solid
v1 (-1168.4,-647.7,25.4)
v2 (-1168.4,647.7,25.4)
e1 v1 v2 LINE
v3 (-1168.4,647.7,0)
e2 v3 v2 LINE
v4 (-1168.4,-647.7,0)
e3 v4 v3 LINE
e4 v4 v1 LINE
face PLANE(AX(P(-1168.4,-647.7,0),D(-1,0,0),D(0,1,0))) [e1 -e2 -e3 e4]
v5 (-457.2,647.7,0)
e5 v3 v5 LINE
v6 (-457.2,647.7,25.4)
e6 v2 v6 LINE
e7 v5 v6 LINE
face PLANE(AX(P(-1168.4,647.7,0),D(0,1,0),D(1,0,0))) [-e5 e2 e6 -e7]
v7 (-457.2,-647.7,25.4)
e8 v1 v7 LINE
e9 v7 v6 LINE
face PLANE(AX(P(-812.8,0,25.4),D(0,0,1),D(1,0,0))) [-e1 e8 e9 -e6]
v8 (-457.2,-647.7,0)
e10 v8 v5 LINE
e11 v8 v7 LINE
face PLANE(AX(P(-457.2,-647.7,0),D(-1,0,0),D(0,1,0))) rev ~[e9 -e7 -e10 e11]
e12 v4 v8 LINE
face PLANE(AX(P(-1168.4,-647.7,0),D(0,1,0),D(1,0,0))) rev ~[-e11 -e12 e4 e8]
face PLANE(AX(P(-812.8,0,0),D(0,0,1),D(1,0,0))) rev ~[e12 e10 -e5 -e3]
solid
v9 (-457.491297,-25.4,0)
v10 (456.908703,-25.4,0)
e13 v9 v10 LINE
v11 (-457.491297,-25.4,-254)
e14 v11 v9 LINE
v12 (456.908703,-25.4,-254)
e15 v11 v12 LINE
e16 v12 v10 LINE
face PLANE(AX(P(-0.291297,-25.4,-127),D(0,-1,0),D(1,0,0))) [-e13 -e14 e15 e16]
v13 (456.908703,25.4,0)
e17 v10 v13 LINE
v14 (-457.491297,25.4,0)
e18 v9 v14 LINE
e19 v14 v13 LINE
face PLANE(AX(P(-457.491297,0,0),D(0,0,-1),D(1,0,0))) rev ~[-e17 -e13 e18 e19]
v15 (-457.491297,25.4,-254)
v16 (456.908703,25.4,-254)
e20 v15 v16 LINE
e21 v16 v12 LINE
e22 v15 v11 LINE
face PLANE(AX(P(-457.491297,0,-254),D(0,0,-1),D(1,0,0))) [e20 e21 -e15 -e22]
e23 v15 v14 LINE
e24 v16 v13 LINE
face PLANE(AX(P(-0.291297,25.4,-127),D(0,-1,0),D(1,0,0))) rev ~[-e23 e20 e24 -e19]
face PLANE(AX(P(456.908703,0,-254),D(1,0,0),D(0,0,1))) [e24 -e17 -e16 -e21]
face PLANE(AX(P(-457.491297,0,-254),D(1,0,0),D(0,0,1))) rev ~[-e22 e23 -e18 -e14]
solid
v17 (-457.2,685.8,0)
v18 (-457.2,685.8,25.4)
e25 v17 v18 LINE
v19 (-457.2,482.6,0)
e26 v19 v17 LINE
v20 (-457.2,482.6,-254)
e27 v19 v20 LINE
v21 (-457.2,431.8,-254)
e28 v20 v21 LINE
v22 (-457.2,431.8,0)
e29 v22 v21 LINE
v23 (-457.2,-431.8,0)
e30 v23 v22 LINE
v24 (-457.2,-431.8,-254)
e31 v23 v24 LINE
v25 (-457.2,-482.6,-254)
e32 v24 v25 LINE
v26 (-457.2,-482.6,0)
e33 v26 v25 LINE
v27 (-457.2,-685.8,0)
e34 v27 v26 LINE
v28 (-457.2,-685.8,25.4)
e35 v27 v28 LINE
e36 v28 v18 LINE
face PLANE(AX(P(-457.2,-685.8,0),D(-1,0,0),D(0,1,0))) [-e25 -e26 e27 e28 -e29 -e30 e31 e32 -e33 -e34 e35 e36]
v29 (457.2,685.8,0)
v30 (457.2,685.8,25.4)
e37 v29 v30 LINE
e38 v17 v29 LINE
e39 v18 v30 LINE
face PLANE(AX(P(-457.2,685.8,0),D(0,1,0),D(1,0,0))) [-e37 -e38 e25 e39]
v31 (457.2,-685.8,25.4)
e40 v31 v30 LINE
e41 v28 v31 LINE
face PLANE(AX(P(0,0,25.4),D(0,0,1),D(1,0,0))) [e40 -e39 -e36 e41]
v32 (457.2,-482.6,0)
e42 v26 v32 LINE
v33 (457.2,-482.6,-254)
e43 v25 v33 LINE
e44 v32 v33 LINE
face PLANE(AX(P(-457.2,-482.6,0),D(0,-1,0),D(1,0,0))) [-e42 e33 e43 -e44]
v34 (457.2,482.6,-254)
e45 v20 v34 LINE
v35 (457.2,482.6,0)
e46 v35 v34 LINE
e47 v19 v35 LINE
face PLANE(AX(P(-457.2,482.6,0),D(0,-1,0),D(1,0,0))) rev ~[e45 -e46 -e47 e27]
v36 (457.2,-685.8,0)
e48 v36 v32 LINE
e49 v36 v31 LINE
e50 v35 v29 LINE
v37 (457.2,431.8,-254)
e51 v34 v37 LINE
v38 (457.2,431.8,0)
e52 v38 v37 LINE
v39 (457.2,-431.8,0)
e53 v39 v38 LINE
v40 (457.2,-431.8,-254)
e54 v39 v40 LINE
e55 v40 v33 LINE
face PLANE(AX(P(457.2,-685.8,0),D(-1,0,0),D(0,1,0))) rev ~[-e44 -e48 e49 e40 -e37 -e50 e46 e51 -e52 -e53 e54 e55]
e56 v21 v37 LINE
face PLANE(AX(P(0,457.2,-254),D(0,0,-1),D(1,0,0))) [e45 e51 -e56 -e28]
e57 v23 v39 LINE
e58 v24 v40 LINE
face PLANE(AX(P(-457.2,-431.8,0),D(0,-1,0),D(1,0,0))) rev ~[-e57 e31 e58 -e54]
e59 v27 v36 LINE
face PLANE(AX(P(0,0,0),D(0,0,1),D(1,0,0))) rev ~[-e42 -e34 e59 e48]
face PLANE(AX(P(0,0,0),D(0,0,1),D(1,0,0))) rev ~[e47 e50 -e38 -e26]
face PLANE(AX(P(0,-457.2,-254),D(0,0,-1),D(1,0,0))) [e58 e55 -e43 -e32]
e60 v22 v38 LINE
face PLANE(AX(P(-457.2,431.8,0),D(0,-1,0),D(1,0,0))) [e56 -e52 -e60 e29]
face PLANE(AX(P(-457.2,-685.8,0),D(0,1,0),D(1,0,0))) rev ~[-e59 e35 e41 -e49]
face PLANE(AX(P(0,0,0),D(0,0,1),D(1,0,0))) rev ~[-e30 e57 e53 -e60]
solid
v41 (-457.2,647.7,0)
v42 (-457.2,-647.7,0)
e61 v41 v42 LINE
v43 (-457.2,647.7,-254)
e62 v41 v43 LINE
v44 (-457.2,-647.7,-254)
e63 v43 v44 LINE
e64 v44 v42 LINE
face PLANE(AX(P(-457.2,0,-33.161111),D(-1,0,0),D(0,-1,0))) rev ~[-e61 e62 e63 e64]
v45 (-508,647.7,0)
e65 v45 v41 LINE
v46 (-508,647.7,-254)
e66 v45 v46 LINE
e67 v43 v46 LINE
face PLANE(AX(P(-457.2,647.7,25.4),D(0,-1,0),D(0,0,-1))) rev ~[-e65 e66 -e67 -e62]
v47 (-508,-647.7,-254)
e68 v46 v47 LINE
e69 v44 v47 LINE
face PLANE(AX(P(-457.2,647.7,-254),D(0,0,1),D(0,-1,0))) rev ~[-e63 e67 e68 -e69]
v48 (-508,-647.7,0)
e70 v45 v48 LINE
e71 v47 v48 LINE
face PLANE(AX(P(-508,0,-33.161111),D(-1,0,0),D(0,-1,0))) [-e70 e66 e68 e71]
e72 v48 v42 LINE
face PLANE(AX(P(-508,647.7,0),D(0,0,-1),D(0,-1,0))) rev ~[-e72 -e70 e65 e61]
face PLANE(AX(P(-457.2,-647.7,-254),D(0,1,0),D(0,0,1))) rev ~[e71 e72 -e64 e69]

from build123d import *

# Parameters (mm, degrees)
F0_W      = 914.4
F0_H      = 1371.6
F1_DEPTH  = 25.4
F2_W      = 660.4
F2_H      = 1295.4
F3_DEPTH  = 25.4
F4_W      = 914.4
F4_H      = 254
F5_DEPTH  = 25.4
F6_W      = 914.4
F6_H      = 50.8
F7_DEPTH  = 254
F9_W      = 165.1
F9_H      = 254
F9_W_2    = 863.6
F10_DEPTH = 50.8
F11_W     = 1295.4
F11_H     = 25.4
F12_DEPTH = 50.8
F13_W     = 711.2
F13_H     = 1295.4
F14_DEPTH = 25.4


with BuildPart() as f1:
    # F0 (on Top) → F1 (new body)
    with BuildSketch(Plane.XY):
        Rectangle(F0_W, F0_H)
    extrude(amount=F1_DEPTH)

    # F6 (on face) → F7 (join)
    with BuildSketch(Plane(origin=(0, 0, 0), x_dir=(1, 0, 0), z_dir=(0, 0, -1))):
        with Locations((0, 457.2)):
            Rectangle(F6_W, F6_H)
        with Locations((0, -457.2)):
            Rectangle(F6_W, F6_H)
    extrude(amount=F7_DEPTH)


with BuildPart() as f3:
    # F2 (on Top) → F3 (new body)
    with BuildSketch(Plane.XY):
        with Locations((-993.5793445587, 28.9456365585)):
            Rectangle(F2_W, F2_H)
    extrude(amount=F3_DEPTH)


with BuildPart() as f5:
    # F4 (on Front) → F5 (new body, symmetric)
    with BuildSketch(Plane.XZ):
        with Locations((-0.2912971497, -127)):
            Rectangle(F4_W, F4_H)
    extrude(amount=F5_DEPTH, both=True)


with BuildPart() as f10:
    # F9 (on face) → F10 (new body)
    with BuildSketch(Plane(origin=(-457.2, 0, 0), x_dir=(0, -1, 0), z_dir=(-1, 0, 0))):
        Polygon((647.7, 25.4), (-647.7, 25.4), (-647.7, 0), (-482.6, 0), (-482.6, -254), (-431.8, -254), (-431.8, 0), (431.8, 0), (431.8, -254), (482.6, -254), (482.6, 0), (647.7, 0), align=None)
        Polygon((-482.6, 0), (-647.7, 0), (-647.7, -174.1451999916), (-647.7, -254), (-482.6, -254), align=None)
        with Locations((565.15, -127)):
            Rectangle(F9_W, F9_H)
        with Locations((0, -127)):
            Rectangle(F9_W_2, F9_H)
    extrude(amount=F10_DEPTH)

    # F11 (on face) → F12 (cut)
    with BuildSketch(Plane(origin=(-508, 0, 0), x_dir=(0, -1, 0), z_dir=(-1, 0, 0))):
        with Locations((0, 12.7)):
            Rectangle(F11_W, F11_H)
    extrude(amount=-F12_DEPTH, mode=Mode.SUBTRACT)


with BuildPart() as f14:
    # F13 (on face) → F14 (new body)
    with BuildSketch(Plane.XY):
        with Locations((-812.8, 0)):
            Rectangle(F13_W, F13_H)
    extrude(amount=F14_DEPTH)


solid = Compound([f1.part, f5.part, f10.part, f14.part])
